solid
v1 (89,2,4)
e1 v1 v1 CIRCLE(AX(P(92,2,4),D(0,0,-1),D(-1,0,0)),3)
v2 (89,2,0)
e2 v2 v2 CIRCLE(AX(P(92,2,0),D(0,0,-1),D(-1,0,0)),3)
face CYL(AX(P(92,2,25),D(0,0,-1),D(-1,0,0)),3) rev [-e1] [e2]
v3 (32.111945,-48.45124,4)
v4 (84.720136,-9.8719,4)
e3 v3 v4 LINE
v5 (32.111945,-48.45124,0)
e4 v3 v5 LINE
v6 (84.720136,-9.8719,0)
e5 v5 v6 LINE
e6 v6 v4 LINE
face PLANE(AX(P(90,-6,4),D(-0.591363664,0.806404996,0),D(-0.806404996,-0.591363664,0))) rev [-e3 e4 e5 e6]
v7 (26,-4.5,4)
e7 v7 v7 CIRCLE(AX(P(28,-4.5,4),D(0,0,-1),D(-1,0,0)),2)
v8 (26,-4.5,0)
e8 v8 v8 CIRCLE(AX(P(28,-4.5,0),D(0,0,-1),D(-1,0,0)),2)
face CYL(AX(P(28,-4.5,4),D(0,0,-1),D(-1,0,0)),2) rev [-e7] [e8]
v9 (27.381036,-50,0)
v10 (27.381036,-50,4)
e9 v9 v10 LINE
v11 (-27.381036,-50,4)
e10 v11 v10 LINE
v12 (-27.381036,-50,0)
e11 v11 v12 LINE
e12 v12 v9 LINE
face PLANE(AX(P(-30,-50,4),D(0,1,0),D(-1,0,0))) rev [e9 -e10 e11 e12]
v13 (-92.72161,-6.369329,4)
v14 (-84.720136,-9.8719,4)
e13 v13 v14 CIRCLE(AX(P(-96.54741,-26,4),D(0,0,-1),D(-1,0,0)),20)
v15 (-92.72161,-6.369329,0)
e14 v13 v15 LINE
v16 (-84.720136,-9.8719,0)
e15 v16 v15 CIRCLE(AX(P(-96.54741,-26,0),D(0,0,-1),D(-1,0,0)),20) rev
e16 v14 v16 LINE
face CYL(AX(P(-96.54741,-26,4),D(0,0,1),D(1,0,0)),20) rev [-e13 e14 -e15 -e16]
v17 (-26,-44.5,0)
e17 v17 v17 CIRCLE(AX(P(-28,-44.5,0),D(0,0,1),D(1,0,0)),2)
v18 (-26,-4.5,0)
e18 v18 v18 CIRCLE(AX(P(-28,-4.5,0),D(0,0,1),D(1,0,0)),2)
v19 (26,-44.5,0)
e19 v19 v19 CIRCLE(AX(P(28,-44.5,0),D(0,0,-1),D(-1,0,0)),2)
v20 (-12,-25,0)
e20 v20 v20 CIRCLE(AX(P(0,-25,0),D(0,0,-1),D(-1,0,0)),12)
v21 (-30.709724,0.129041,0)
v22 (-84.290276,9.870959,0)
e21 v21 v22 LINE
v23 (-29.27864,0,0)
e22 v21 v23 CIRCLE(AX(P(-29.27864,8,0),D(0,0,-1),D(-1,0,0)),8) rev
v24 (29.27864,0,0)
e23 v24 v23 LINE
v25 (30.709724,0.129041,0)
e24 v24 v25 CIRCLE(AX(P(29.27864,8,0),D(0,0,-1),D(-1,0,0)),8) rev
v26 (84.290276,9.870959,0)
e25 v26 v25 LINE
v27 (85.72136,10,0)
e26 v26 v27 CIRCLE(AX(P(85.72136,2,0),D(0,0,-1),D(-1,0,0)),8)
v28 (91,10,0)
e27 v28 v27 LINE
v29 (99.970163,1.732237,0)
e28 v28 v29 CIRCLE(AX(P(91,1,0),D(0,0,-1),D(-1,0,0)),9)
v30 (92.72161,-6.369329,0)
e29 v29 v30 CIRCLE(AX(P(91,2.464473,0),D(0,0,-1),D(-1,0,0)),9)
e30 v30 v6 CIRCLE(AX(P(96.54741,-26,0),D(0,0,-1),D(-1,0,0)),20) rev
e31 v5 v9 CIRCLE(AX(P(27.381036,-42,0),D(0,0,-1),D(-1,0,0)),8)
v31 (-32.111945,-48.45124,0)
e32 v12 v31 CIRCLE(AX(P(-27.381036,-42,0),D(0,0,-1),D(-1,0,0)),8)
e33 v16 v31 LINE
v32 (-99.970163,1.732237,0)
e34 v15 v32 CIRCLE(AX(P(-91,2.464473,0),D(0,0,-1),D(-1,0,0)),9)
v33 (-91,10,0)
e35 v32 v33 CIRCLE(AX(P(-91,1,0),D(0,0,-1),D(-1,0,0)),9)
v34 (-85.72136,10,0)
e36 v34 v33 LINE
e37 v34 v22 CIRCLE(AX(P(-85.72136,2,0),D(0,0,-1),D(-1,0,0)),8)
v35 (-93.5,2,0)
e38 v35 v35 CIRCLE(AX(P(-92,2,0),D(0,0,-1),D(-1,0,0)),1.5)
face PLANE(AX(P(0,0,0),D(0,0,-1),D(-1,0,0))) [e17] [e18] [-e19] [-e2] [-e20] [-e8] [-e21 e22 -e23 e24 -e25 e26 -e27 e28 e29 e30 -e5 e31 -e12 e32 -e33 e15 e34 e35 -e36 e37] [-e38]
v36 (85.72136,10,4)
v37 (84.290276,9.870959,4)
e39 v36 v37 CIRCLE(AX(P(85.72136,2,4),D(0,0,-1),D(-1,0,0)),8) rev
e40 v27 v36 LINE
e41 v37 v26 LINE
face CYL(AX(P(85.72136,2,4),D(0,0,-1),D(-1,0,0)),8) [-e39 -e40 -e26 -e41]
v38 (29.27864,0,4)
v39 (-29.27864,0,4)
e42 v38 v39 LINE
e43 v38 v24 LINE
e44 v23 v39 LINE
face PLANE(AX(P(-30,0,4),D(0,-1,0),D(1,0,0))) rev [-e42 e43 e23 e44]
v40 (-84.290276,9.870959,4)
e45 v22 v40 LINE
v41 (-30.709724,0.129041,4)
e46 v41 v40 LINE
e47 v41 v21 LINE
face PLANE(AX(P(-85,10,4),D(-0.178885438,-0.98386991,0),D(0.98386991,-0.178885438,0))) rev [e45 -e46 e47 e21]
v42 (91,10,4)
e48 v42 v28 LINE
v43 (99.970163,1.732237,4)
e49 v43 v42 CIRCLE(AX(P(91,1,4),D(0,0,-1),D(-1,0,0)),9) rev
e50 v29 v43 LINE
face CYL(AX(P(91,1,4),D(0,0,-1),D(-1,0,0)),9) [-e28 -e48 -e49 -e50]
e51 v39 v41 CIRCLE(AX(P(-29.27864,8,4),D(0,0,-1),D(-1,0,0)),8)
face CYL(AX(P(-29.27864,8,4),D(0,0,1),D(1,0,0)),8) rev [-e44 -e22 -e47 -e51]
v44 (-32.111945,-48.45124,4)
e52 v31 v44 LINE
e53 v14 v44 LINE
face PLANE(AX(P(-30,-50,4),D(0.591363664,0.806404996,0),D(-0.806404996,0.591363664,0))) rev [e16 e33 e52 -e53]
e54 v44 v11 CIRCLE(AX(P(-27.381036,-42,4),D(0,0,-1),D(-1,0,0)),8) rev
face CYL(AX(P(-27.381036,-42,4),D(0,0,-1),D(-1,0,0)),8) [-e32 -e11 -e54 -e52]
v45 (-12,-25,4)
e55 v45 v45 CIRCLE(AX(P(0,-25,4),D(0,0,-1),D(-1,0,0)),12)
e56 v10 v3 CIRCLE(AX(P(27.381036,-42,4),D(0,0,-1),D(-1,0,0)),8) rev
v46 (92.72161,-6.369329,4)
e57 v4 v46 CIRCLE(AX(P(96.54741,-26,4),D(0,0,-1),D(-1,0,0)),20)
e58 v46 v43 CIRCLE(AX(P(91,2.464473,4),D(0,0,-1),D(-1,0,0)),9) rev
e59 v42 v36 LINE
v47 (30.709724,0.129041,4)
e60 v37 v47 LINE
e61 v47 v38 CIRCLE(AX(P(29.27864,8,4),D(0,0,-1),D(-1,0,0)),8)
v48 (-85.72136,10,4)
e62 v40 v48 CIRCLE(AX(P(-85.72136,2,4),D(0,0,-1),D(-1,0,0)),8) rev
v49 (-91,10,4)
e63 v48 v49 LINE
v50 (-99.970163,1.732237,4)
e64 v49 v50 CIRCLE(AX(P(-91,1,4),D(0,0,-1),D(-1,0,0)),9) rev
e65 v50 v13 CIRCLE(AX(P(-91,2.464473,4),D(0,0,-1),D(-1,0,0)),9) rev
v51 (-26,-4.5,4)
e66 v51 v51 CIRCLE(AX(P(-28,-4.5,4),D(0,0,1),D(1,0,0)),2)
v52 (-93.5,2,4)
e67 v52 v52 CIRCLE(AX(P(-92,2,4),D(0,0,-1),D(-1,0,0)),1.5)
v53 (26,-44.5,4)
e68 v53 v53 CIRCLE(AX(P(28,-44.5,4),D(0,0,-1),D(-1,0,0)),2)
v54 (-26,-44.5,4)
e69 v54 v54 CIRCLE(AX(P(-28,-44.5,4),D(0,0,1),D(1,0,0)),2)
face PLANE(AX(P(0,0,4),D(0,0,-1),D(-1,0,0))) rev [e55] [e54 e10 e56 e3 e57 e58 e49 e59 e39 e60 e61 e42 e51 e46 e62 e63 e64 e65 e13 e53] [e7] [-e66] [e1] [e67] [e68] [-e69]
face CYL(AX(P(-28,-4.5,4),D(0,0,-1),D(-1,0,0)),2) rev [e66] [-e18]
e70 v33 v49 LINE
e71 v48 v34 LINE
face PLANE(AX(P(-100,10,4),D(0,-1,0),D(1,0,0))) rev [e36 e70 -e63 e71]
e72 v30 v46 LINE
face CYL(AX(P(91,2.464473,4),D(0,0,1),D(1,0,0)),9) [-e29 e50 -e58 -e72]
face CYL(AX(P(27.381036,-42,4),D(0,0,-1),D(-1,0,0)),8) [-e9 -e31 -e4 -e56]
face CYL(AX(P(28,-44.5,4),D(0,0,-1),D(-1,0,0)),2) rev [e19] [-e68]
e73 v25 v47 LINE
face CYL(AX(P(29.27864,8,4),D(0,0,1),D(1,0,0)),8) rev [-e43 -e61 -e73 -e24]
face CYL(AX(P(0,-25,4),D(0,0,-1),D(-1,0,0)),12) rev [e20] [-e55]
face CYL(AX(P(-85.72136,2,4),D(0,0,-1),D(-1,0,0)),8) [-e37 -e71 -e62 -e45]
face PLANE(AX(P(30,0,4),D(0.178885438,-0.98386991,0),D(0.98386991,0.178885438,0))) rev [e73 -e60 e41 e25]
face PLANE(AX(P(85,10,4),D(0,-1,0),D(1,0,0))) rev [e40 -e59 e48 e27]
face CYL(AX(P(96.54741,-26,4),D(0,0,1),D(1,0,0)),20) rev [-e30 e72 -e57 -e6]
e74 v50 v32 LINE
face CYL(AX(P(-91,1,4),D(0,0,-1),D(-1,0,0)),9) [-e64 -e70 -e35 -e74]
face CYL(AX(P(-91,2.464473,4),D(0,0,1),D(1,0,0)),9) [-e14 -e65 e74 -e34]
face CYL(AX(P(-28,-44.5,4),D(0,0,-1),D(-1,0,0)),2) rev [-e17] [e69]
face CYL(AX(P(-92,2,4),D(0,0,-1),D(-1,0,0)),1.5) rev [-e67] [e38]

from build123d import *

# Parameters (mm, degrees)
EXTRUDE_1_DEPTH     = 4
FILLET_1_R          = 8
FILLET_2_R          = 20
SKETCH_3_R          = 2
CUT_EXTRUDE_2_DEPTH = 112.874930168
SKETCH_2_R          = 12
CUT_EXTRUDE_1_DEPTH = 112.874930168
SKETCH_4_R          = 1.5
CUT_EXTRUDE_3_DEPTH = 112.874930168
FILLET_3_R          = 9
SKETCH_5_R          = 3
SKETCH_5_R_2        = 1.5
CUT_EXTRUDE_4_DEPTH = 25


with BuildPart() as part:
    # 草图1 → 凸台-拉伸1 (new body)
    with BuildSketch(Plane.XY):
        Polygon((-100, 10), (-85, 10), (-30, 0), (30, 0), (85, 10), (100, 10), (100, -6), (90, -6), (30, -50), (-30, -50), (-90, -6), (-100, -6), align=None)
    extrude(amount=EXTRUDE_1_DEPTH)

    # 圆角1
    fillet_1_edges = [part.edges().sort_by_distance(p)[0] for p in [
        (-85, 10, 2),
        (-30, 0, 2),
        (30, 0, 2),
        (85, 10, 2),
        (30, -50, 2),
        (-30, -50, 2),
    ]]
    fillet(fillet_1_edges, radius=FILLET_1_R)

    # 圆角2
    fillet_2_edges = [part.edges().sort_by_distance(p)[0] for p in [
        (90, -6, 2),
        (-90, -6, 2),
    ]]
    fillet(fillet_2_edges, radius=FILLET_2_R)

    # 草图3 → 切除-拉伸2 (cut, through all)
    with BuildSketch(Plane(origin=(0, 0, 0), x_dir=(-1, 0, 0), z_dir=(0, 0, -1))):
        with Locations((-28, -4.5)):
            Circle(SKETCH_3_R)
        with Locations((-28, -44.5)):
            Circle(SKETCH_3_R)
    cut_extrude_2 = extrude(amount=-CUT_EXTRUDE_2_DEPTH, mode=Mode.SUBTRACT)

    # 草图2 → 切除-拉伸1 (cut, through all)
    with BuildSketch(Plane(origin=(0, 0, 0), x_dir=(-1, 0, 0), z_dir=(0, 0, -1))):
        with Locations((0, -25)):
            Circle(SKETCH_2_R)
    extrude(amount=-CUT_EXTRUDE_1_DEPTH, mode=Mode.SUBTRACT)

    # 镜向1: 切除-拉伸2 across plane
    add(cut_extrude_2.mirror(Plane(origin=(0, 0, 0), x_dir=(0, 0, 1), z_dir=(1, 0, 0))), mode=Mode.SUBTRACT)

    # 草图4 → 切除-拉伸3 (cut, through all)
    with BuildSketch(Plane(origin=(0, 0, 0), x_dir=(-1, 0, 0), z_dir=(0, 0, -1))):
        with Locations((92, 2)):
            Circle(SKETCH_4_R)
    cut_extrude_3 = extrude(amount=-CUT_EXTRUDE_3_DEPTH, mode=Mode.SUBTRACT)

    # 镜向2: 切除-拉伸3 across plane
    add(cut_extrude_3.mirror(Plane(origin=(0, 0, 0), x_dir=(0, 0, 1), z_dir=(1, 0, 0))), mode=Mode.SUBTRACT)

    # 圆角3
    # the kernel refuses this fillet: 9 mm, written as the material it takes off along each edge
    with BuildSketch(Plane(origin=(100, -6, -21.161183572), x_dir=(-0.9987150456948208, -0.05067797847972915, 0), z_dir=(0, 0, 1))) as fillet_3_piece_1:
        with BuildLine():
            CenterArc((8.559473009, -8.909698774), FILLET_3_R, 98.123197137, 78.971924263)
            Line((-0.428962402, -8.453596967), (-1.327805943, -8.407986787))
            Line((-1.327805943, -8.407986787), (-0.898843541, 0.045610181))
            Line((-0.898843541, 0.045610181), (0.045610181, 0.898843541))
            ThreePointArc((0.045610181, 0.898843541), (3.493764236, 0.723873235), (7.160582737, 0.890969877))
            Line((7.160582737, 0.890969877), (7.28775458, 0))
        make_face()
    extrude(amount=46.322367144, mode=Mode.SUBTRACT)
    with BuildSketch(Plane(origin=(100, 10, -22.5), x_dir=(0, -1, 0), z_dir=(0, 0, 1))) as fillet_3_piece_2:
        with BuildLine():
            CenterArc((FILLET_3_R, -FILLET_3_R), FILLET_3_R, 90, 90)
            Line((0, -FILLET_3_R), (0, 0))
            Line((0, 0), (FILLET_3_R, 0))
        make_face()
    extrude(amount=49, mode=Mode.SUBTRACT)
    with BuildSketch(Plane(origin=(-100, -6, -21.161183572), x_dir=(0.9987150456948208, -0.05067797847972878, 0), z_dir=(0, 0, 1))) as fillet_3_piece_3:
        with BuildLine():
            CenterArc((8.559473009, 8.909698774), FILLET_3_R, 182.9048786, 78.971924263)
            Line((-0.428962402, 8.453596967), (-1.327805943, 8.407986787))
            Line((-1.327805943, 8.407986787), (-0.898843541, -0.045610181))
            Line((-0.898843541, -0.045610181), (0.045610181, -0.898843541))
            ThreePointArc((0.045610181, -0.898843541), (3.493764236, -0.723873235), (7.160582737, -0.890969877))
            Line((7.160582737, -0.890969877), (7.28775458, 0))
        make_face()
    extrude(amount=46.322367144, mode=Mode.SUBTRACT)
    with BuildSketch(Plane(origin=(-100, 10, -22.5), x_dir=(0, -1, 0), z_dir=(0, 0, 1))) as fillet_3_piece_4:
        with BuildLine():
            CenterArc((FILLET_3_R, FILLET_3_R), FILLET_3_R, 180, 90)
            Line((0, FILLET_3_R), (0, 0))
            Line((0, 0), (FILLET_3_R, 0))
        make_face()
    extrude(amount=49, mode=Mode.SUBTRACT)

    # 草图5 → 切除-拉伸4 (cut)
    with BuildSketch(Plane(origin=(0, 0, 0), x_dir=(-1, 0, 0), z_dir=(0, 0, -1))):
        with Locations((-92, 2)):
            Circle(SKETCH_5_R)
        with Locations((-92, 2)):
            Circle(SKETCH_5_R_2, mode=Mode.SUBTRACT)
    extrude(amount=-CUT_EXTRUDE_4_DEPTH, mode=Mode.SUBTRACT)


solid = part.part
